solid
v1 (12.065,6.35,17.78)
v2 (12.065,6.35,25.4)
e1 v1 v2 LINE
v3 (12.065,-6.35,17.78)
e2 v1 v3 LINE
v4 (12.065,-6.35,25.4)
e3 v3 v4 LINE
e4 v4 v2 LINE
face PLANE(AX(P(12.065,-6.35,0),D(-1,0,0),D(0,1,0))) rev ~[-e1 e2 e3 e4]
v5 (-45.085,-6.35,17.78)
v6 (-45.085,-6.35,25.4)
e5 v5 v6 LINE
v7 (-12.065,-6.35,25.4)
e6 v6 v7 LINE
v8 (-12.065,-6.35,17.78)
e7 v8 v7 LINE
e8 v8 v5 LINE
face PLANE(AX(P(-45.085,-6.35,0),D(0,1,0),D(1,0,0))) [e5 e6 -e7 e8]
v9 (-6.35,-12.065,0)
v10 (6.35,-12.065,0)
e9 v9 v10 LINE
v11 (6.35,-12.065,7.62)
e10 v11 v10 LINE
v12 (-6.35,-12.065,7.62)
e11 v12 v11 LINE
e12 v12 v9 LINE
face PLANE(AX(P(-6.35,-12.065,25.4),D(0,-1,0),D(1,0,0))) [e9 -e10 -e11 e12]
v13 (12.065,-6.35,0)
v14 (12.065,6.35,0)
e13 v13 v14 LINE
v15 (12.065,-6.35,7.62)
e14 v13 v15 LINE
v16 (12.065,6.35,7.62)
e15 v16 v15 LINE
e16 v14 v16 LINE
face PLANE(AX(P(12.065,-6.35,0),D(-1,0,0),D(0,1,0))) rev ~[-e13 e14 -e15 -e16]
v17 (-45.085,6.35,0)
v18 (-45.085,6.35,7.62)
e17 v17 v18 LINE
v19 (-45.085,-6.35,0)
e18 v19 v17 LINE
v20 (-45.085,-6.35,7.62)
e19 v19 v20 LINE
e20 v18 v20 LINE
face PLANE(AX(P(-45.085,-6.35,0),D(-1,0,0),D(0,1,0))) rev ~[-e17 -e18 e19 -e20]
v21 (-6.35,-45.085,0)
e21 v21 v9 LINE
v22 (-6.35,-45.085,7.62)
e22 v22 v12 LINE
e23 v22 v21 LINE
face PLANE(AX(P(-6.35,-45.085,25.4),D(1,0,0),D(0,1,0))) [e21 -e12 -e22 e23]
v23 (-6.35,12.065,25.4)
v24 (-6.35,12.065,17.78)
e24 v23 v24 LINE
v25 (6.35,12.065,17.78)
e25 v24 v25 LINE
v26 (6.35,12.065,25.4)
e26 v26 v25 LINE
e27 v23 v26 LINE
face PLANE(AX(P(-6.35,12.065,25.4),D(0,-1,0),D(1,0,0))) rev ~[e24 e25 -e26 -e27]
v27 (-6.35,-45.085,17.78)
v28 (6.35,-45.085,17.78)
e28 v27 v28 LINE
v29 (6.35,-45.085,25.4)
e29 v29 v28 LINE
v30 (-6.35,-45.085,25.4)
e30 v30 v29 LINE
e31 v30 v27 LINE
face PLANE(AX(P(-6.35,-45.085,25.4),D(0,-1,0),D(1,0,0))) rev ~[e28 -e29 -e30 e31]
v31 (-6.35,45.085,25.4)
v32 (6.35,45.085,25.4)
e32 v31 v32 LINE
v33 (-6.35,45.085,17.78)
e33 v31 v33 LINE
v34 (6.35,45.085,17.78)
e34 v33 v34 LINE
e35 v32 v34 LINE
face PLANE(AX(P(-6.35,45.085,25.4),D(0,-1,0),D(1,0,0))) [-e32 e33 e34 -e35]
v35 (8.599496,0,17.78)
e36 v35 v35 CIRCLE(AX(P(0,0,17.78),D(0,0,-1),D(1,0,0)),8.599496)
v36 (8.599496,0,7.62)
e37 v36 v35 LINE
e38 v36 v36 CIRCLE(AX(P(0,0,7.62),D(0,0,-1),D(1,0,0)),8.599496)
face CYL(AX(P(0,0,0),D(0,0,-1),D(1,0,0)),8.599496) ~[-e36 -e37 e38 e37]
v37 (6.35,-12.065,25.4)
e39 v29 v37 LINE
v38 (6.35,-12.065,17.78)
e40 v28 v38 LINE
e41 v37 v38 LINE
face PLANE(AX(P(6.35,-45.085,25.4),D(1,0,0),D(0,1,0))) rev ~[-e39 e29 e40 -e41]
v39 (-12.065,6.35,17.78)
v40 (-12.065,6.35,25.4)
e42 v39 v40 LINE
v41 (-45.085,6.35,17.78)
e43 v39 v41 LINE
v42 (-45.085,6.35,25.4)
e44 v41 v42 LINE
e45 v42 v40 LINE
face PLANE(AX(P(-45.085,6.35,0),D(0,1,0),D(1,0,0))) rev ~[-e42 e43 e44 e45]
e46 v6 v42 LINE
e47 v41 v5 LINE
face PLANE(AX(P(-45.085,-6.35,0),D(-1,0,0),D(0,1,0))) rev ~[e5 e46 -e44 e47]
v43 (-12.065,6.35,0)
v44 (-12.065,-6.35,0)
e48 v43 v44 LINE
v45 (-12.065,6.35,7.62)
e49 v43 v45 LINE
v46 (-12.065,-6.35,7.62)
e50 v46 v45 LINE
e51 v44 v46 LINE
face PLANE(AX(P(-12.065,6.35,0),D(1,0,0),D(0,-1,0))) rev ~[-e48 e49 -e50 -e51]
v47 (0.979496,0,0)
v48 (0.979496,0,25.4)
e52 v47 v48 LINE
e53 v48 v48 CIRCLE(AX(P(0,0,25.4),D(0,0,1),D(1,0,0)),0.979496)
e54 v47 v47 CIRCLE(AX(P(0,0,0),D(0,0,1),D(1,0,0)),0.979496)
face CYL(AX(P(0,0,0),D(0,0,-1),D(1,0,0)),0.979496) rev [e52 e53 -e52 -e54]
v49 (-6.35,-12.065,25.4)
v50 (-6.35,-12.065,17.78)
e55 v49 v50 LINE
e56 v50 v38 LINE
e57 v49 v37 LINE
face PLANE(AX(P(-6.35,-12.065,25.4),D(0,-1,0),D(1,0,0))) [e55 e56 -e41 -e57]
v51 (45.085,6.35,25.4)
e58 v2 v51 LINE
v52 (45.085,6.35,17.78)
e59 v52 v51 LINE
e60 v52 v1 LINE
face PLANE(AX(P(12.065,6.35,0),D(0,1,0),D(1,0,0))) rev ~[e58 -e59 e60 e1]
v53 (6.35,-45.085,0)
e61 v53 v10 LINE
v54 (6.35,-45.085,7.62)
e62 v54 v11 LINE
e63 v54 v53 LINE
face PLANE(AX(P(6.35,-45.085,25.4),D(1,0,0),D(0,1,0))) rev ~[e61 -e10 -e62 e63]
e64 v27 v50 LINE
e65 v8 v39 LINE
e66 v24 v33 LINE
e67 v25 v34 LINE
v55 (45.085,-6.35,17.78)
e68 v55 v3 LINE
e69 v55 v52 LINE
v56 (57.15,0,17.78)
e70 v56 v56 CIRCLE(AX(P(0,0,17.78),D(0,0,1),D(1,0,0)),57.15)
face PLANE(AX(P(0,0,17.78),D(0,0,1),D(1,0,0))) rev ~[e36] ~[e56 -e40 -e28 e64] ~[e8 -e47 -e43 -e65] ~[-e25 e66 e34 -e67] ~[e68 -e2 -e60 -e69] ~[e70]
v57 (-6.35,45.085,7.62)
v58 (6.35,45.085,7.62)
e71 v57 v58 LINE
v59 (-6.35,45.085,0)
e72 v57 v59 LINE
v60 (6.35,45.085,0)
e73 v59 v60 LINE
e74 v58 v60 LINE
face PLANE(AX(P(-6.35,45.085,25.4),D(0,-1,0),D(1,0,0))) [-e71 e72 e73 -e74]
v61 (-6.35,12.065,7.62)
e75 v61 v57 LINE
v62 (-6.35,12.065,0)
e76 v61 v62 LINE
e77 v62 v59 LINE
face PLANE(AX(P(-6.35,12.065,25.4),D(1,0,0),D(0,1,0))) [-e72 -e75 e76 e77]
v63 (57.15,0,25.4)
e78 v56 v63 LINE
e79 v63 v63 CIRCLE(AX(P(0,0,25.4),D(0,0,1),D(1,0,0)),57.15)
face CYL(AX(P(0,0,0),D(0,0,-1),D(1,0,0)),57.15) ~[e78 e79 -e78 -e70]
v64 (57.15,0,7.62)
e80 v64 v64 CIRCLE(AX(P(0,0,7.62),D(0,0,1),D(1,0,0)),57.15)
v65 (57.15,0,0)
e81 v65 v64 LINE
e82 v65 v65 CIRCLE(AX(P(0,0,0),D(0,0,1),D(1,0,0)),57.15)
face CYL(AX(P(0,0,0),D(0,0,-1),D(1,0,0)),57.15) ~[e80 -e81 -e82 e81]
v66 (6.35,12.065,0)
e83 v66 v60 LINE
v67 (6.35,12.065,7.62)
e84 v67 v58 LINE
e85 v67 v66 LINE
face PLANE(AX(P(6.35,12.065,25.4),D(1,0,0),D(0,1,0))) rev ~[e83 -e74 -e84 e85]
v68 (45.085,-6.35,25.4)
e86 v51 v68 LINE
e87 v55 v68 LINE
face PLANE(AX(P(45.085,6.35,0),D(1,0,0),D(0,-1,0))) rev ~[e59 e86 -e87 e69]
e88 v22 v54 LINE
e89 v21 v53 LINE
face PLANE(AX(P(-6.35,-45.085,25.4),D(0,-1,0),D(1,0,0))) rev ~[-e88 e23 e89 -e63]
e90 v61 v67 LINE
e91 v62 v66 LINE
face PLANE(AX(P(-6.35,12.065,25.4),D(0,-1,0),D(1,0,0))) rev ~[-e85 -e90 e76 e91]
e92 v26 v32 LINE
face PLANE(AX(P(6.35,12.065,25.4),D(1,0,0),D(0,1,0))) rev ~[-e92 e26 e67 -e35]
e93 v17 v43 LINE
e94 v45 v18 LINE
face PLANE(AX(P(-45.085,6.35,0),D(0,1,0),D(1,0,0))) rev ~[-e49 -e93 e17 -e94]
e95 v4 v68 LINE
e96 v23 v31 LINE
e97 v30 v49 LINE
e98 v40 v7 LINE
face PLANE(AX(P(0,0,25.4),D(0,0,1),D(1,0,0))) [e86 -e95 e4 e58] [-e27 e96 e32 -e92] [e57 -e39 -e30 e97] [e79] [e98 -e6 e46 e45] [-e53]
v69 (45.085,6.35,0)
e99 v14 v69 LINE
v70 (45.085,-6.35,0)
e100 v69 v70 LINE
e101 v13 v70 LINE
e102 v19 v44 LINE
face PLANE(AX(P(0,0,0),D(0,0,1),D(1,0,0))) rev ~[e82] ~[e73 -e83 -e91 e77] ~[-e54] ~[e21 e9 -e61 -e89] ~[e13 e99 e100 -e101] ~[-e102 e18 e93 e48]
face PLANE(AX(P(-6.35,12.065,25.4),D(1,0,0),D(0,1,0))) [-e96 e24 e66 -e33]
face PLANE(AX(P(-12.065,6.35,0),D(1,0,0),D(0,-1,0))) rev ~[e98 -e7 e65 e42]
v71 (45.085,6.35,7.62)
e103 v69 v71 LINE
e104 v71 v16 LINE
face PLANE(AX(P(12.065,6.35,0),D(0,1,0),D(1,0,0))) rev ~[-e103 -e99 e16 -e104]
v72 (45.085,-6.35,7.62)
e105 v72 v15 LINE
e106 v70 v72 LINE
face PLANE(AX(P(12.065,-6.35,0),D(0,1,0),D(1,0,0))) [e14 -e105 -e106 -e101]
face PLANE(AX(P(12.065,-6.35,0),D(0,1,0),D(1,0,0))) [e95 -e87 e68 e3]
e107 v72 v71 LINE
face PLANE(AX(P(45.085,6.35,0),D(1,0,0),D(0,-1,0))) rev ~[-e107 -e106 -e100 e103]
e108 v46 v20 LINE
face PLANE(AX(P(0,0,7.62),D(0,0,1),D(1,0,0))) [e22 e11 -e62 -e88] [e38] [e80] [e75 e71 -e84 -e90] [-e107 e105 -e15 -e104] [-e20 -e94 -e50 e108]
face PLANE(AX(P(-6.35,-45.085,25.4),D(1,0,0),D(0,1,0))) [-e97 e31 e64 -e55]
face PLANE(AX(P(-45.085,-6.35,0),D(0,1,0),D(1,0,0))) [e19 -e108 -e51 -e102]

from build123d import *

# Parameters (mm, degrees)
F0_R     = 57.15
F0_R_2   = 0.9794958553
F1_DEPTH = 25.4
F3_T     = -7.62
F4_W     = 12.7
F4_H     = 33.02
F5_DEPTH = 25.4
F6_DEPTH = 25.4
F7_W     = 33.02
F7_H     = 6.35
F8_DEPTH = 25.4


# Not quite as in the source:
# - a feature of the source that left no trace in its solid (it failed there, or was rolled back) is left out


with BuildPart() as f1:
    # F0 (on Top) → F1 (new body)
    with BuildSketch(Plane.XY):
        Circle(F0_R)
        Circle(F0_R_2, mode=Mode.SUBTRACT)
    extrude(amount=F1_DEPTH)

    # F3
    f3_openings = [f1.faces().sort_by_distance(p)[0] for p in [
        (-57.15, 0, 12.7),
    ]]
    offset(amount=F3_T, openings=f3_openings)

    # F4 (on face) → F5 (cut)
    with BuildSketch(Plane.XY.offset(25.4)):
        with Locations((0, -28.575)):
            Rectangle(F4_W, F4_H)
    extrude(amount=-F5_DEPTH, mode=Mode.SUBTRACT)

    # F4 (on face) → F6 (cut)
    with BuildSketch(Plane.XY.offset(25.4)):
        with Locations((0, 28.575)):
            Rectangle(F4_W, F4_H)
        with Locations((0, -28.575)):
            Rectangle(F4_W, F4_H)
    extrude(amount=-F6_DEPTH, mode=Mode.SUBTRACT)

    # F7 (on face) → F8 (cut)
    with BuildSketch(Plane(origin=(0, 0, 0), x_dir=(1, 0, 0), z_dir=(0, 0, -1))):
        with Locations((28.575, 3.175)):
            Rectangle(F7_W, F7_H)
        with Locations((28.575, -3.175)):
            Rectangle(F7_W, F7_H)
        with Locations((-28.575, -3.175)):
            Rectangle(F7_W, F7_H)
        with Locations((-28.575, 3.175)):
            Rectangle(F7_W, F7_H)
    extrude(amount=-F8_DEPTH, mode=Mode.SUBTRACT)


solid = f1.part
